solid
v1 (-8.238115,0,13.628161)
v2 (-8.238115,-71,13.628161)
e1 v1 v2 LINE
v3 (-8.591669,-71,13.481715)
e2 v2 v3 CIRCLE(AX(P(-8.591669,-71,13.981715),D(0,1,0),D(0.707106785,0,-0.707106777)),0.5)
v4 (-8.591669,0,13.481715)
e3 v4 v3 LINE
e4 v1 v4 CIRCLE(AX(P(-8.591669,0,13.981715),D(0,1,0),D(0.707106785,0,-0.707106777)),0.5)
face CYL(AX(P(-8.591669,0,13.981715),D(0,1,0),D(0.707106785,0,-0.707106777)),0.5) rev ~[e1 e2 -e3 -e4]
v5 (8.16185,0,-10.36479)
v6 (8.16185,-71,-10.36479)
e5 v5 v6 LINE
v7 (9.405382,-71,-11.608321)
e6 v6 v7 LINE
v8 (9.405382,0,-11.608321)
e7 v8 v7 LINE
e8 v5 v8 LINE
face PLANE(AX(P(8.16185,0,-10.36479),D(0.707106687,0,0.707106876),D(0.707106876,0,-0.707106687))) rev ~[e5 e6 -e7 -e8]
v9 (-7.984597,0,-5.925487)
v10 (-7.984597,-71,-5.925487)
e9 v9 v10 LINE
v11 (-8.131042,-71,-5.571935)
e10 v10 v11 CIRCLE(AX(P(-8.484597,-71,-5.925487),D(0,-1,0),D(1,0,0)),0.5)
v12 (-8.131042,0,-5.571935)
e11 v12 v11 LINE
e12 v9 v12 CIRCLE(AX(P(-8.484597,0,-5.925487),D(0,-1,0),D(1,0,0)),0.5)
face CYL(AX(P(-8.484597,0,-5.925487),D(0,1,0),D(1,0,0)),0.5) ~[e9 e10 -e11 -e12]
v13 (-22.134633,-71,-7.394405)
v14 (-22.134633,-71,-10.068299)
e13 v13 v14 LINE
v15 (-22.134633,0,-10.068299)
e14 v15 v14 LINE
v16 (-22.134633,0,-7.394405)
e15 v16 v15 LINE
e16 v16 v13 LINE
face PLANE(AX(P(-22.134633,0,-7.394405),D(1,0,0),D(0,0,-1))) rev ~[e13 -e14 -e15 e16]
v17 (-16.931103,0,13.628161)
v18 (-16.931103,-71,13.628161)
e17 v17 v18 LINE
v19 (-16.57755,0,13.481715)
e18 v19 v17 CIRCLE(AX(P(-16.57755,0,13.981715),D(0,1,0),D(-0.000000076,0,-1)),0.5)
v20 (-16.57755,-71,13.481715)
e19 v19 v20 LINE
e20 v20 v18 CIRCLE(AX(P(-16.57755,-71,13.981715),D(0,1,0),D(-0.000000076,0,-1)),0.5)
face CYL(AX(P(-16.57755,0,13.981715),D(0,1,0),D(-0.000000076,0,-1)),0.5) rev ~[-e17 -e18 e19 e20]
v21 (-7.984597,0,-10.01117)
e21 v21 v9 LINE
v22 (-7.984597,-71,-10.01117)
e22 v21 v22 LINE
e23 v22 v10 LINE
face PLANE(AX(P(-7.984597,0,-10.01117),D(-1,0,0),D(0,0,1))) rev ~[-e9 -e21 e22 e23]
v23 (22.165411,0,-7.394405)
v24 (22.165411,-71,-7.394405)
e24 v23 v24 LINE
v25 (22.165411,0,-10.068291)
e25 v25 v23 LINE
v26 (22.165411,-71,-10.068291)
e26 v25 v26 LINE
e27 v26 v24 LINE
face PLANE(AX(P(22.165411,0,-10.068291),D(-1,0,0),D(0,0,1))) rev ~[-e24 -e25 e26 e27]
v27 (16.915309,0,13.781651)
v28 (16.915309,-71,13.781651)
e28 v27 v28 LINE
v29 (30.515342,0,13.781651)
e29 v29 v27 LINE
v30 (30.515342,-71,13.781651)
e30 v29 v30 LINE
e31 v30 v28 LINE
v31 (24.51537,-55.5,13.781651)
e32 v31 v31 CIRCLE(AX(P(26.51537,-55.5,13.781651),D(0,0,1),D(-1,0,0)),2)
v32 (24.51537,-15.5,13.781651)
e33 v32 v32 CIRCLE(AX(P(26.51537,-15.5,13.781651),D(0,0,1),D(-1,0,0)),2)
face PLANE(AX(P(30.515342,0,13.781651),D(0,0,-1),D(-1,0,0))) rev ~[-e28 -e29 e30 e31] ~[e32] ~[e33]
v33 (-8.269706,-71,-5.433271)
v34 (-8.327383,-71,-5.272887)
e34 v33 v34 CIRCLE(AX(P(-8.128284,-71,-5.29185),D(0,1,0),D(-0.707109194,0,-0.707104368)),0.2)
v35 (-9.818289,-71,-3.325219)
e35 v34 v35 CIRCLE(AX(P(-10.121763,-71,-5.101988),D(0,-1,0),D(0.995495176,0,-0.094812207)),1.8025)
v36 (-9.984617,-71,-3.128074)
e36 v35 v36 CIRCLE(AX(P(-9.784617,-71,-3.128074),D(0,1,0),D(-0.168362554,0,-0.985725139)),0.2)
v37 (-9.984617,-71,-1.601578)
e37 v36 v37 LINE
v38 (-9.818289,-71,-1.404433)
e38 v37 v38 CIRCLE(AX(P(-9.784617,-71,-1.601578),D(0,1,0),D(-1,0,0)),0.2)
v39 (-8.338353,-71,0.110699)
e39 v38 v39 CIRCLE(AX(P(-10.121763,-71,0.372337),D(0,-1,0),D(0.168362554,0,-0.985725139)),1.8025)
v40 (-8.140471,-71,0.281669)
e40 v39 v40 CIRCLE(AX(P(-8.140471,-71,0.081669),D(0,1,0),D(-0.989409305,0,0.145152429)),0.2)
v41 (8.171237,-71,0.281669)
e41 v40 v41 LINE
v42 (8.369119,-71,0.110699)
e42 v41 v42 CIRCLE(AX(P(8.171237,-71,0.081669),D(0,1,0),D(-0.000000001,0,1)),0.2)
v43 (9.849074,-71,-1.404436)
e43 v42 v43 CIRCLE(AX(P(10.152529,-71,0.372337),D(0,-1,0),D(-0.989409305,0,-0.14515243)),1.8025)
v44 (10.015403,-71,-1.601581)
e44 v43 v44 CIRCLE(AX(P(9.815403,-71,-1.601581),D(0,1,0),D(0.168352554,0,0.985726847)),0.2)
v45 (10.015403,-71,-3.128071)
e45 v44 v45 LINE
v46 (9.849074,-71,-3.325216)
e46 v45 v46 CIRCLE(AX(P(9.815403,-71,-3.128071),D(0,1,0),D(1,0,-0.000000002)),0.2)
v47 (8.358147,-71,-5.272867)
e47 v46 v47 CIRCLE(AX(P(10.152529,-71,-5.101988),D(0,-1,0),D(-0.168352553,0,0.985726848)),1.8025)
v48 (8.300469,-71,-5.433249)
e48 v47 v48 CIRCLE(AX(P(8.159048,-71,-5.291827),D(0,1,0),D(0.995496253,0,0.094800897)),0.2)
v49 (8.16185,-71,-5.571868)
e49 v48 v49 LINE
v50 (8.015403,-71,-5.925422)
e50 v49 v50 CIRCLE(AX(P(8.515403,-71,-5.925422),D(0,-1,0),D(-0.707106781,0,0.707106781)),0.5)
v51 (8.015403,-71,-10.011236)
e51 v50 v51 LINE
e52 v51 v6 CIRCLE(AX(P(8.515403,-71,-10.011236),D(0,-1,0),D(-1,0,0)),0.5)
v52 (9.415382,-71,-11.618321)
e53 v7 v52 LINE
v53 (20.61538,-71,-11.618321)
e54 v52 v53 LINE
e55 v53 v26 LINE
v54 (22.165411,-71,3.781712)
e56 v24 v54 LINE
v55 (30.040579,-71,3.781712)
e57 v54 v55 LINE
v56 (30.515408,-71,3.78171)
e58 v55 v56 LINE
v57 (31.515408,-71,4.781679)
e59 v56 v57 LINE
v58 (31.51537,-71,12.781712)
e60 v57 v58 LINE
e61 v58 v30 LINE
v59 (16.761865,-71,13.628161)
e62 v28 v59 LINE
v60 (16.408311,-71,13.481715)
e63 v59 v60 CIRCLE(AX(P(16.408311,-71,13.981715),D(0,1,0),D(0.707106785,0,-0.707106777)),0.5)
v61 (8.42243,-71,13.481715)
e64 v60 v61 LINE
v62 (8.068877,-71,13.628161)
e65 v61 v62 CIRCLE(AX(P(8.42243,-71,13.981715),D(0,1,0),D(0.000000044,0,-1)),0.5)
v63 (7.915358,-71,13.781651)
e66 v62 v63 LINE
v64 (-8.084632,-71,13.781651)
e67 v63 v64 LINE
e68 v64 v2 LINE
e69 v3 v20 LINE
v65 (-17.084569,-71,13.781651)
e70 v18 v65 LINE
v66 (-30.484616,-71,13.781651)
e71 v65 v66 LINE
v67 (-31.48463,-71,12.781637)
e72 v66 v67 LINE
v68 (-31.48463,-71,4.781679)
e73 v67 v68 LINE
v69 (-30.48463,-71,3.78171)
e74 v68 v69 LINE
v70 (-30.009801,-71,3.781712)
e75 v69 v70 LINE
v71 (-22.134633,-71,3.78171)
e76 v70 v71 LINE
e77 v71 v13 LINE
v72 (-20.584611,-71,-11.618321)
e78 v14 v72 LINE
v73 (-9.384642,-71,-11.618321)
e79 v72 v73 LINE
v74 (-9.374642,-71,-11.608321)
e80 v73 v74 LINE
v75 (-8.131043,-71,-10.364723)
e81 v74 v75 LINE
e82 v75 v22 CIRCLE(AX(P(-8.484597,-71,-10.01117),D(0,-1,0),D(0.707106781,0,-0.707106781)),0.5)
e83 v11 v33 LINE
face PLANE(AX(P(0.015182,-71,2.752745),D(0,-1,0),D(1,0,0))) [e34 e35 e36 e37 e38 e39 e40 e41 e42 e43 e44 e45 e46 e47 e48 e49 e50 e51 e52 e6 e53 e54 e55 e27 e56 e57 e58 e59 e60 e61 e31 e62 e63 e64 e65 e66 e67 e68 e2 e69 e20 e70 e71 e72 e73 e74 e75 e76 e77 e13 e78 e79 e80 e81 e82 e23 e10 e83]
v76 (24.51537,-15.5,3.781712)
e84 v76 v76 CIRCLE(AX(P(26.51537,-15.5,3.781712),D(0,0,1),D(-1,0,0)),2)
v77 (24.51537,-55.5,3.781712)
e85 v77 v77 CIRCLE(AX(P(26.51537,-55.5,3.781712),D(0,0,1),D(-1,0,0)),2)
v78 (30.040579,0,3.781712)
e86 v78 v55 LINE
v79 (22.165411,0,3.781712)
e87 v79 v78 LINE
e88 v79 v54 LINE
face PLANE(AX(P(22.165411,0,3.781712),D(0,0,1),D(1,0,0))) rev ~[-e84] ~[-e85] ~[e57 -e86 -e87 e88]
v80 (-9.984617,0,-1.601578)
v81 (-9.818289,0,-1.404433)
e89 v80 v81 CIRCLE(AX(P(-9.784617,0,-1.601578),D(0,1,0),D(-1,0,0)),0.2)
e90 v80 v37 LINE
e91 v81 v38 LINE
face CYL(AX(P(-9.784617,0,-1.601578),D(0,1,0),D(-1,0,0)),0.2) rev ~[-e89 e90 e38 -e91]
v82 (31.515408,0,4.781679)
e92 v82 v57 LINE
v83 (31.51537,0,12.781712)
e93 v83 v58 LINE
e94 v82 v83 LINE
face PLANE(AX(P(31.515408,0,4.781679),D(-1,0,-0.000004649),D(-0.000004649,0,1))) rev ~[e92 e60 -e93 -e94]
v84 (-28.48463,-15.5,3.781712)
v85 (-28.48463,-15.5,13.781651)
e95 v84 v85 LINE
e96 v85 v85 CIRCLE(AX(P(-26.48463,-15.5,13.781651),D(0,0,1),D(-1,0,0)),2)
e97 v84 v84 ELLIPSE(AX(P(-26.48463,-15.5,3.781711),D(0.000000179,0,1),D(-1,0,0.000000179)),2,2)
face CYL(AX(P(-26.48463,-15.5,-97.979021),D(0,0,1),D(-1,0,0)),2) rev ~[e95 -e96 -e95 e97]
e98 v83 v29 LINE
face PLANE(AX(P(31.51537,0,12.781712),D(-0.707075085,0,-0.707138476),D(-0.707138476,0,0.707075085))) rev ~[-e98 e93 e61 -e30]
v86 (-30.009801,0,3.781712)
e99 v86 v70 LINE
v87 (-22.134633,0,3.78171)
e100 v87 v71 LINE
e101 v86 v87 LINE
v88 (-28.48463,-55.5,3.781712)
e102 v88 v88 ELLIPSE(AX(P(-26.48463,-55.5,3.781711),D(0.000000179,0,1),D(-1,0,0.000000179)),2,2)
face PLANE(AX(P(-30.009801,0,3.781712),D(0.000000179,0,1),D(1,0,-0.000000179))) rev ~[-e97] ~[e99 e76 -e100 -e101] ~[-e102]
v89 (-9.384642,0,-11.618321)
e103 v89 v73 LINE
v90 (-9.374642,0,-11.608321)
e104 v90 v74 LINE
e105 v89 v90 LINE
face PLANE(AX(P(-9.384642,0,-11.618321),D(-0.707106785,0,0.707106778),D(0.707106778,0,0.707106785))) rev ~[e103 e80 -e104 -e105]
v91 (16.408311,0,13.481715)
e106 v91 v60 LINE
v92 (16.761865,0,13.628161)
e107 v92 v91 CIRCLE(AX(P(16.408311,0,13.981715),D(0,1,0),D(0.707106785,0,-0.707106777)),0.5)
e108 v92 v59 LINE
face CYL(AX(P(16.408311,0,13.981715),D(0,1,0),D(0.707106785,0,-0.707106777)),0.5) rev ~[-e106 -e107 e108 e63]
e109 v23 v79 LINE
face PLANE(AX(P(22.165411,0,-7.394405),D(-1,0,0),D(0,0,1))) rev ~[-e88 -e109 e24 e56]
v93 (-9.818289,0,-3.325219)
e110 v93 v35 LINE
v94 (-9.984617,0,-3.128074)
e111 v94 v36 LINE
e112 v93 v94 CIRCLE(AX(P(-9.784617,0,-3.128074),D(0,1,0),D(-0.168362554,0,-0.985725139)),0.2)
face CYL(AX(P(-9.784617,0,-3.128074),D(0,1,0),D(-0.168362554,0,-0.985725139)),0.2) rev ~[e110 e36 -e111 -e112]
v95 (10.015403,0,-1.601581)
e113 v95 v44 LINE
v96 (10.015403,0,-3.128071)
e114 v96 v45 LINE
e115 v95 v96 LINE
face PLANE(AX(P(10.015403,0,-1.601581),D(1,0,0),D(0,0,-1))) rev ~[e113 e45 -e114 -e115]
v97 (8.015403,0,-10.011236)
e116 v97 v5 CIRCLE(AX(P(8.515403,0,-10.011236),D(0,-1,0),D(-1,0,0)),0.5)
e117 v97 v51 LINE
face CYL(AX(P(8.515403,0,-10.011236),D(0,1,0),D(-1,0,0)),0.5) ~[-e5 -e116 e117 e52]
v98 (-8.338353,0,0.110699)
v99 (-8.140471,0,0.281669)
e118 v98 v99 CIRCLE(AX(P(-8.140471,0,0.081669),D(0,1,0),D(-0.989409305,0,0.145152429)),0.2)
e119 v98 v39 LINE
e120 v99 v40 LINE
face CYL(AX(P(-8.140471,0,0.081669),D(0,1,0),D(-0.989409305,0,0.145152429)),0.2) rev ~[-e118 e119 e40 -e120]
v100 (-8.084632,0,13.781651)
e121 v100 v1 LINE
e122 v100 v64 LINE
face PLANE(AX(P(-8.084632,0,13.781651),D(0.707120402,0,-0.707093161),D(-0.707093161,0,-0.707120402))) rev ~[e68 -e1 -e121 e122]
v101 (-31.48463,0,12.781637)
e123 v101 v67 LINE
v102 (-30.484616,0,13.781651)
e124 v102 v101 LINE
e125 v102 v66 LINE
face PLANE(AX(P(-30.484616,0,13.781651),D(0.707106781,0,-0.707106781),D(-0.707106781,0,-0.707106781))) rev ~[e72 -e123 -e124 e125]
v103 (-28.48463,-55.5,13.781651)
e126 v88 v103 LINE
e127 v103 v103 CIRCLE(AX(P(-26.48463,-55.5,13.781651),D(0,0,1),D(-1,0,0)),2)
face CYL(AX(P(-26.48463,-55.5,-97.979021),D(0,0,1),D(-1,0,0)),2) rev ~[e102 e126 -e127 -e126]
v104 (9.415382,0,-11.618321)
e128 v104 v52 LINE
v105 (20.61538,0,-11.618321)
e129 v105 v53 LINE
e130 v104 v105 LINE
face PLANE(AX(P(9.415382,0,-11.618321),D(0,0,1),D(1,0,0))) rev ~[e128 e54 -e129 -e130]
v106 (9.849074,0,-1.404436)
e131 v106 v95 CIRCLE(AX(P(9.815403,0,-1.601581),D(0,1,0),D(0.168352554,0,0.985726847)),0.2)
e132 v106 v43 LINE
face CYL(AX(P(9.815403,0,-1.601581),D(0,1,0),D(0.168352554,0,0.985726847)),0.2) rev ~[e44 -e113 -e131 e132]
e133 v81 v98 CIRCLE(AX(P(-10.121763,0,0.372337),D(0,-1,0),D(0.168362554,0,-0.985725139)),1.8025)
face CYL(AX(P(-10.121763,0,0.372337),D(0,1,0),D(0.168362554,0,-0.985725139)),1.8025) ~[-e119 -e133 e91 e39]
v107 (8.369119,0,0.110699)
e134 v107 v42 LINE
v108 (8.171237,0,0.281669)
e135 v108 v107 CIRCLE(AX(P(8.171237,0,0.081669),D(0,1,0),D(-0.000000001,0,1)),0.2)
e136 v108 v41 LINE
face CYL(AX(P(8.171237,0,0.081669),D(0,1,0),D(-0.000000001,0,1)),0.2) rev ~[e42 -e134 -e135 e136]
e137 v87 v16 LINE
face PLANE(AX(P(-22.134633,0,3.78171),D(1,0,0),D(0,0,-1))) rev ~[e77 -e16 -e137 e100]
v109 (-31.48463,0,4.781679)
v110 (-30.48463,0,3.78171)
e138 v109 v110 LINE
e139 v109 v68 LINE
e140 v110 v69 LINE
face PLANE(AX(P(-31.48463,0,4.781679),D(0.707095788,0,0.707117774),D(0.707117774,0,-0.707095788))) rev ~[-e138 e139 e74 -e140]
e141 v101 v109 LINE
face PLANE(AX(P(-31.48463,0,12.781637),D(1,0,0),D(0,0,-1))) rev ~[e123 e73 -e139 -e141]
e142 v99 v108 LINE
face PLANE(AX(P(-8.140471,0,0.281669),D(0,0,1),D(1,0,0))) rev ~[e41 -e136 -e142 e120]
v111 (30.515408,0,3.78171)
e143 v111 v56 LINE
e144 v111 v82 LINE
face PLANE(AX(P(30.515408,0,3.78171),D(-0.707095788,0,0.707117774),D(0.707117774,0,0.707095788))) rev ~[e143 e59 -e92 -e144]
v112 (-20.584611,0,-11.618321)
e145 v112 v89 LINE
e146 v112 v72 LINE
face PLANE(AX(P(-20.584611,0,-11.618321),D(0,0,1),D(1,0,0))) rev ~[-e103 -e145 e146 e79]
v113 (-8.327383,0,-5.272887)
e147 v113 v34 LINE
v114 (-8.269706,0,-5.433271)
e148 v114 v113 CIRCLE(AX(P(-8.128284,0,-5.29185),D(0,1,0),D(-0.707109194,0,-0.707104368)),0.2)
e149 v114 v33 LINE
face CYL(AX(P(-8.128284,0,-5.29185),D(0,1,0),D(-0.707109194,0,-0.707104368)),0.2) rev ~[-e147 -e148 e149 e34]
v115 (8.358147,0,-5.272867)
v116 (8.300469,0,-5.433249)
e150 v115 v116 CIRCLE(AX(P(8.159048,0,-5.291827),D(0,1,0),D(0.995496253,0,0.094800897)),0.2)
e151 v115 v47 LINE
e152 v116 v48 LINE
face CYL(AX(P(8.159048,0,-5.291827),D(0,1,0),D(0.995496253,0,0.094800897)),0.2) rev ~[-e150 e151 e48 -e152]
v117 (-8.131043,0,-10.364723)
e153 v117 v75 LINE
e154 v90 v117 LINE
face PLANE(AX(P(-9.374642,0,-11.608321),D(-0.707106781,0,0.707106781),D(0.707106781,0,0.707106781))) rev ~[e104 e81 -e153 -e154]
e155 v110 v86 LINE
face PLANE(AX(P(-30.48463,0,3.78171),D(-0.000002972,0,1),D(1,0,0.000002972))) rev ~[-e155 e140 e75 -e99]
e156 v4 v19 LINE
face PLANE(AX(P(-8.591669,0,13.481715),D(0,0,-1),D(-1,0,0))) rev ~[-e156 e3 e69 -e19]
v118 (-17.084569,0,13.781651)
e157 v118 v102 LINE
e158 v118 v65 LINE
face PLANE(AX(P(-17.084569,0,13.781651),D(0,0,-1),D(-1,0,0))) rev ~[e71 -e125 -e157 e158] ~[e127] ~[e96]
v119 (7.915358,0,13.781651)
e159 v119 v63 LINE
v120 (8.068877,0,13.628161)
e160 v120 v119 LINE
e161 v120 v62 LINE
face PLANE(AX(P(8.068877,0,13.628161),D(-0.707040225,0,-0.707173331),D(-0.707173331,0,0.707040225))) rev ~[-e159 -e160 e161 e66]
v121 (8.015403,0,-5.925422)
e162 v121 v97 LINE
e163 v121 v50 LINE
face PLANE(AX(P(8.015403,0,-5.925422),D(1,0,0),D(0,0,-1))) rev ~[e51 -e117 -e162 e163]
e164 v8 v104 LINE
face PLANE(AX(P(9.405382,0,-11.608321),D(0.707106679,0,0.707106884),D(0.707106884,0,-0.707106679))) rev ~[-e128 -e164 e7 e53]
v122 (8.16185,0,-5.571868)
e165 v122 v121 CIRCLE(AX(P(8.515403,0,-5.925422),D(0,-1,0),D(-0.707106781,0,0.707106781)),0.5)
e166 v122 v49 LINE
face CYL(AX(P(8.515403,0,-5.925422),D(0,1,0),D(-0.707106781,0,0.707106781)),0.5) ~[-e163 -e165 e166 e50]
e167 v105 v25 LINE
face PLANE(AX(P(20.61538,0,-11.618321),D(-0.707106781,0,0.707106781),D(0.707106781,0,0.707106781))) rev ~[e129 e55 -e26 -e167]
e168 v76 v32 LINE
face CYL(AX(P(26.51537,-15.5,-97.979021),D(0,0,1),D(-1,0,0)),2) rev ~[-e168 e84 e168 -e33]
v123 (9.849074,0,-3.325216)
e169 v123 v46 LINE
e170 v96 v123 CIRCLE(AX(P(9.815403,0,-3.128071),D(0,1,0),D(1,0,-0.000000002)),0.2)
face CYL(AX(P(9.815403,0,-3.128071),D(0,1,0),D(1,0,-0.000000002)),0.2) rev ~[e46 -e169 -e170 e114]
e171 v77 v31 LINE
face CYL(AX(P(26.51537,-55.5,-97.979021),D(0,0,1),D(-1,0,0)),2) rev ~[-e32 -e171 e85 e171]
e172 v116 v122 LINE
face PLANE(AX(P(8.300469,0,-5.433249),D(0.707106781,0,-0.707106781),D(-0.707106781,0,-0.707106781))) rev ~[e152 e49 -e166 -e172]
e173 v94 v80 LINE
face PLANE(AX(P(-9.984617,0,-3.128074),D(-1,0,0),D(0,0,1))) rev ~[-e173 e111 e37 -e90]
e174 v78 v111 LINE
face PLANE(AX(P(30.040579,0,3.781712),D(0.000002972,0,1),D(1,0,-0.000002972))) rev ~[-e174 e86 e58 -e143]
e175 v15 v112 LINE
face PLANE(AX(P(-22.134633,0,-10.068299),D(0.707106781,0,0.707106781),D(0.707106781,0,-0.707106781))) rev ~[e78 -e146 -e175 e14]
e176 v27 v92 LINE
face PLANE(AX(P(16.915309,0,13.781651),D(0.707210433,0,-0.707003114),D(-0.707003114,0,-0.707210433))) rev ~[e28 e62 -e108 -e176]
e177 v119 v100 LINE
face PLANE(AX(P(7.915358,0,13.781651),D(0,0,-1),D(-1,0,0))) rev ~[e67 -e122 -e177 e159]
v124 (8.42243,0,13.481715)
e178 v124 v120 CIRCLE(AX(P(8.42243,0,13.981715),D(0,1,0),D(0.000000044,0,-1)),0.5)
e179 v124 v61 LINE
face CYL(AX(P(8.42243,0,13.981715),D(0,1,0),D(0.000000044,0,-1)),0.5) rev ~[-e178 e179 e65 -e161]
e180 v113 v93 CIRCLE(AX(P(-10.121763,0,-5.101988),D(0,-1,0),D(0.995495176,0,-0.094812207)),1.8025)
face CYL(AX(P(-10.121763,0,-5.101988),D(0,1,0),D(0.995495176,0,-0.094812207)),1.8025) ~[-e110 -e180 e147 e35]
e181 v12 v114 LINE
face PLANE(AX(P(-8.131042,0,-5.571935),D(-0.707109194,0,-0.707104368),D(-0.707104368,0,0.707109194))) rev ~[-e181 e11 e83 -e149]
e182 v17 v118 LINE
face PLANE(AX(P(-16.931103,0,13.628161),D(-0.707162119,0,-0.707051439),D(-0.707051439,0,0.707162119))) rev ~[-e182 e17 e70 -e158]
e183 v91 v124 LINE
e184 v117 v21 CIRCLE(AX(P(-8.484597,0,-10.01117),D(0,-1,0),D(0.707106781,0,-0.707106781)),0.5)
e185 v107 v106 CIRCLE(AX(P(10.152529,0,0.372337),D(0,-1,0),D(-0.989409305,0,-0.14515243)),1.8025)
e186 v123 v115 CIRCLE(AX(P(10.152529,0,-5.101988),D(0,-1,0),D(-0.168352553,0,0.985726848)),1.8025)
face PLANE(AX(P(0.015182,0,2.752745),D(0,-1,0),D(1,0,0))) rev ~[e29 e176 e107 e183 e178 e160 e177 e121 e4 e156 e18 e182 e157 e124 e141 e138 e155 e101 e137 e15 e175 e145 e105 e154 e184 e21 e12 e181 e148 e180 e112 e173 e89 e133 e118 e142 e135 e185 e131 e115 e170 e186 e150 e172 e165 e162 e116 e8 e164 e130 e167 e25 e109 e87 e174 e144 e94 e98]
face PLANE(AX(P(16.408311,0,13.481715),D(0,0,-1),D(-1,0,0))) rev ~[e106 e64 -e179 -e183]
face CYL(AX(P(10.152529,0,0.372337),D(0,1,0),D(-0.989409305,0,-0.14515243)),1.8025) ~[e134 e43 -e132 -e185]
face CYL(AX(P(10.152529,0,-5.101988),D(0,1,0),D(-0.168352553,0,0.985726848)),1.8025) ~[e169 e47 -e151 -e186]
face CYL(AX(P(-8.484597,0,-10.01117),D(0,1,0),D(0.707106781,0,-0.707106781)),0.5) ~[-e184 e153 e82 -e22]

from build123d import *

# Parameters (mm, degrees)
F1_DEPTH = 71
F3_D     = 4


# Not quite as in the source:
# - ends of sketch curves that miss each other by under 0.0002 mm in the source are joined


with BuildPart() as f1:
    # F0 (on Front) → F1 (new body)
    with BuildSketch(Plane.XZ):
        with BuildLine():
            Line((8.1618498422, -10.3647895785), (9.4053820611, -11.6083214649))
            Line((9.4053820611, -11.6083214649), (9.415382064, -11.6183214649))
            Line((9.415382064, -11.6183214649), (20.6153802021, -11.6183214651))
            Line((20.6153802021, -11.6183214651), (22.165411006, -10.0682906612))
            Line((22.165411006, -10.0682906612), (22.1654110059, -7.3944052326))
            Line((22.1654110059, -7.3944052326), (22.1654110059, 3.7817118842))
            Line((22.1654110059, 3.7817118842), (30.0405793841, 3.7817118842))
            Line((30.0405793841, 3.7817118842), (30.515407573, 3.7817104728))
            Line((30.515407573, 3.7817104728), (31.5154075725, 4.7816793802))
            Line((31.5154075725, 4.7816793802), (31.5153703792, 12.7817118841))
            Line((31.5153703792, 12.7817118841), (30.5153417686, 13.7816508489))
            Line((30.5153417686, 13.7816508489), (16.9153093619, 13.7816508489))
            Line((16.9153093619, 13.7816508489), (16.7618646746, 13.6281611659))
            ThreePointArc((16.7618646746, 13.6281611659), (16.5996530095, 13.5197747929), (16.4083113037, 13.4817145544))
            Line((16.4083113037, 13.4817145544), (8.422430452, 13.4817145544))
            ThreePointArc((8.422430452, 13.4817145544), (8.2310887291, 13.5197747818), (8.0688770472, 13.6281611561))
            Line((8.0688770472, 13.6281611561), (7.9153584589, 13.7816508489))
            Line((7.9153584589, 13.7816508489), (-8.0846315282, 13.7816508491))
            Line((-8.0846315282, 13.7816508491), (-8.2381152983, 13.628161166))
            ThreePointArc((-8.2381152983, 13.628161166), (-8.4003269909, 13.5197747816), (-8.5916687288, 13.4817145545))
            Line((-8.5916687288, 13.4817145545), (-16.5775495805, 13.4817145545))
            ThreePointArc((-16.5775495805, 13.4817145545), (-16.7688912713, 13.5197747934), (-16.9311029256, 13.6281611562))
            Line((-16.9311029256, 13.6281611562), (-17.0845685953, 13.7816508491))
            Line((-17.0845685953, 13.7816508491), (-30.4846162694, 13.7816508492))
            Line((-30.4846162694, 13.7816508492), (-31.4846296209, 12.7816374978))
            Line((-31.4846296209, 12.7816374978), (-31.4846296209, 4.7816793804))
            Line((-31.4846296209, 4.7816793804), (-30.4846296214, 3.781710473))
            Line((-30.4846296214, 3.781710473), (-30.0098014316, 3.7817118844))
            Line((-30.0098014316, 3.7817118844), (-22.1346330541, 3.781710473))
            Line((-22.1346330541, 3.781710473), (-22.1346330541, -7.3944052328))
            Line((-22.1346330541, -7.3944052328), (-22.134633054, -10.068299435))
            Line((-22.134633054, -10.068299435), (-20.5846110242, -11.6183214649))
            Line((-20.5846110242, -11.6183214649), (-9.3846416371, -11.618321465))
            Line((-9.3846416371, -11.618321465), (-9.3746416371, -11.6083214649))
            Line((-9.3746416371, -11.6083214649), (-8.1310434239, -10.3647232516))
            ThreePointArc((-8.1310434239, -10.3647232516), (-8.0226570482, -10.2025115772), (-7.9845968145, -10.011169861))
            Line((-7.9845968145, -10.011169861), (-7.9845968145, -5.9254873742))
            ThreePointArc((-7.9845968145, -5.9254873742), (-8.0226567217, -5.7341464462), (-8.1310422173, -5.5719351901))
            Line((-8.1310422173, -5.5719351901), (-8.2697056959, -5.4332707651))
            ThreePointArc((-8.2697056959, -5.4332707651), (-8.3164840652, -5.3595306247), (-8.3273828922, -5.2728874501))
            ThreePointArc((-8.3273828922, -5.2728874501), (-8.6904695936, -4.0063582713), (-9.8182893525, -3.3252190015))
            ThreePointArc((-9.8182893525, -3.3252190015), (-9.9374803464, -3.2570419887), (-9.9846168416, -3.1280739736))
            Line((-9.9846168416, -3.1280739736), (-9.9846168416, -1.6015777605))
            ThreePointArc((-9.9846168416, -1.6015777605), (-9.9374803464, -1.4726097454), (-9.8182893525, -1.4044327326))
            ThreePointArc((-9.8182893525, -1.4044327326), (-8.8323144095, -0.8871586543), (-8.3383526746, 0.1106994843))
            ThreePointArc((-8.3383526746, 0.1106994843), (-8.2712261249, 0.2330065304), (-8.1404708137, 0.2816689983))
            Line((-8.1404708137, 0.2816689983), (8.1712371304, 0.2816689983))
            ThreePointArc((8.1712371304, 0.2816689983), (8.3019924416, 0.2330065304), (8.3691189913, 0.1106994843))
            ThreePointArc((8.3691189913, 0.1106994843), (8.8630871156, -0.8871651956), (9.8490736962, -1.4044358116))
            ThreePointArc((9.8490736962, -1.4044358116), (9.968266036, -1.4726123905), (10.0154031856, -1.6015811811))
            Line((10.0154031856, -1.6015811811), (10.0154031856, -3.1280705531))
            ThreePointArc((10.0154031856, -3.1280705531), (9.968266036, -3.2570393436), (9.8490736962, -3.3252159226))
            ThreePointArc((9.8490736962, -3.3252159226), (8.7212476918, -4.0063428806), (8.3581472677, -5.2728670656))
            ThreePointArc((8.3581472677, -5.2728670656), (8.3472477253, -5.3595093685), (8.3004693733, -5.4332486014))
            Line((8.3004693733, -5.4332486014), (8.161849795, -5.5718681798))
            ThreePointArc((8.161849795, -5.5718681798), (8.0534634193, -5.7340798542), (8.0154031856, -5.9254215704))
            Line((8.0154031856, -5.9254215704), (8.0154031855, -10.0112361406))
            ThreePointArc((8.0154031855, -10.0112361406), (8.0534634321, -10.2025778877), (8.1618498422, -10.3647895785))
        make_face()
    extrude(amount=F1_DEPTH)

    # F3 (through all)
    with Locations(Plane(origin=(0, 0, 0.2816689983), x_dir=(1, 0, 0), z_dir=(0, 0, -1))):
        with Locations((-26.4846296209, 55.5), (26.5153703791, 55.5), (26.5153703791, 15.5), (-26.4846296209, 15.5)):
            Hole(F3_D / 2)


solid = f1.part
